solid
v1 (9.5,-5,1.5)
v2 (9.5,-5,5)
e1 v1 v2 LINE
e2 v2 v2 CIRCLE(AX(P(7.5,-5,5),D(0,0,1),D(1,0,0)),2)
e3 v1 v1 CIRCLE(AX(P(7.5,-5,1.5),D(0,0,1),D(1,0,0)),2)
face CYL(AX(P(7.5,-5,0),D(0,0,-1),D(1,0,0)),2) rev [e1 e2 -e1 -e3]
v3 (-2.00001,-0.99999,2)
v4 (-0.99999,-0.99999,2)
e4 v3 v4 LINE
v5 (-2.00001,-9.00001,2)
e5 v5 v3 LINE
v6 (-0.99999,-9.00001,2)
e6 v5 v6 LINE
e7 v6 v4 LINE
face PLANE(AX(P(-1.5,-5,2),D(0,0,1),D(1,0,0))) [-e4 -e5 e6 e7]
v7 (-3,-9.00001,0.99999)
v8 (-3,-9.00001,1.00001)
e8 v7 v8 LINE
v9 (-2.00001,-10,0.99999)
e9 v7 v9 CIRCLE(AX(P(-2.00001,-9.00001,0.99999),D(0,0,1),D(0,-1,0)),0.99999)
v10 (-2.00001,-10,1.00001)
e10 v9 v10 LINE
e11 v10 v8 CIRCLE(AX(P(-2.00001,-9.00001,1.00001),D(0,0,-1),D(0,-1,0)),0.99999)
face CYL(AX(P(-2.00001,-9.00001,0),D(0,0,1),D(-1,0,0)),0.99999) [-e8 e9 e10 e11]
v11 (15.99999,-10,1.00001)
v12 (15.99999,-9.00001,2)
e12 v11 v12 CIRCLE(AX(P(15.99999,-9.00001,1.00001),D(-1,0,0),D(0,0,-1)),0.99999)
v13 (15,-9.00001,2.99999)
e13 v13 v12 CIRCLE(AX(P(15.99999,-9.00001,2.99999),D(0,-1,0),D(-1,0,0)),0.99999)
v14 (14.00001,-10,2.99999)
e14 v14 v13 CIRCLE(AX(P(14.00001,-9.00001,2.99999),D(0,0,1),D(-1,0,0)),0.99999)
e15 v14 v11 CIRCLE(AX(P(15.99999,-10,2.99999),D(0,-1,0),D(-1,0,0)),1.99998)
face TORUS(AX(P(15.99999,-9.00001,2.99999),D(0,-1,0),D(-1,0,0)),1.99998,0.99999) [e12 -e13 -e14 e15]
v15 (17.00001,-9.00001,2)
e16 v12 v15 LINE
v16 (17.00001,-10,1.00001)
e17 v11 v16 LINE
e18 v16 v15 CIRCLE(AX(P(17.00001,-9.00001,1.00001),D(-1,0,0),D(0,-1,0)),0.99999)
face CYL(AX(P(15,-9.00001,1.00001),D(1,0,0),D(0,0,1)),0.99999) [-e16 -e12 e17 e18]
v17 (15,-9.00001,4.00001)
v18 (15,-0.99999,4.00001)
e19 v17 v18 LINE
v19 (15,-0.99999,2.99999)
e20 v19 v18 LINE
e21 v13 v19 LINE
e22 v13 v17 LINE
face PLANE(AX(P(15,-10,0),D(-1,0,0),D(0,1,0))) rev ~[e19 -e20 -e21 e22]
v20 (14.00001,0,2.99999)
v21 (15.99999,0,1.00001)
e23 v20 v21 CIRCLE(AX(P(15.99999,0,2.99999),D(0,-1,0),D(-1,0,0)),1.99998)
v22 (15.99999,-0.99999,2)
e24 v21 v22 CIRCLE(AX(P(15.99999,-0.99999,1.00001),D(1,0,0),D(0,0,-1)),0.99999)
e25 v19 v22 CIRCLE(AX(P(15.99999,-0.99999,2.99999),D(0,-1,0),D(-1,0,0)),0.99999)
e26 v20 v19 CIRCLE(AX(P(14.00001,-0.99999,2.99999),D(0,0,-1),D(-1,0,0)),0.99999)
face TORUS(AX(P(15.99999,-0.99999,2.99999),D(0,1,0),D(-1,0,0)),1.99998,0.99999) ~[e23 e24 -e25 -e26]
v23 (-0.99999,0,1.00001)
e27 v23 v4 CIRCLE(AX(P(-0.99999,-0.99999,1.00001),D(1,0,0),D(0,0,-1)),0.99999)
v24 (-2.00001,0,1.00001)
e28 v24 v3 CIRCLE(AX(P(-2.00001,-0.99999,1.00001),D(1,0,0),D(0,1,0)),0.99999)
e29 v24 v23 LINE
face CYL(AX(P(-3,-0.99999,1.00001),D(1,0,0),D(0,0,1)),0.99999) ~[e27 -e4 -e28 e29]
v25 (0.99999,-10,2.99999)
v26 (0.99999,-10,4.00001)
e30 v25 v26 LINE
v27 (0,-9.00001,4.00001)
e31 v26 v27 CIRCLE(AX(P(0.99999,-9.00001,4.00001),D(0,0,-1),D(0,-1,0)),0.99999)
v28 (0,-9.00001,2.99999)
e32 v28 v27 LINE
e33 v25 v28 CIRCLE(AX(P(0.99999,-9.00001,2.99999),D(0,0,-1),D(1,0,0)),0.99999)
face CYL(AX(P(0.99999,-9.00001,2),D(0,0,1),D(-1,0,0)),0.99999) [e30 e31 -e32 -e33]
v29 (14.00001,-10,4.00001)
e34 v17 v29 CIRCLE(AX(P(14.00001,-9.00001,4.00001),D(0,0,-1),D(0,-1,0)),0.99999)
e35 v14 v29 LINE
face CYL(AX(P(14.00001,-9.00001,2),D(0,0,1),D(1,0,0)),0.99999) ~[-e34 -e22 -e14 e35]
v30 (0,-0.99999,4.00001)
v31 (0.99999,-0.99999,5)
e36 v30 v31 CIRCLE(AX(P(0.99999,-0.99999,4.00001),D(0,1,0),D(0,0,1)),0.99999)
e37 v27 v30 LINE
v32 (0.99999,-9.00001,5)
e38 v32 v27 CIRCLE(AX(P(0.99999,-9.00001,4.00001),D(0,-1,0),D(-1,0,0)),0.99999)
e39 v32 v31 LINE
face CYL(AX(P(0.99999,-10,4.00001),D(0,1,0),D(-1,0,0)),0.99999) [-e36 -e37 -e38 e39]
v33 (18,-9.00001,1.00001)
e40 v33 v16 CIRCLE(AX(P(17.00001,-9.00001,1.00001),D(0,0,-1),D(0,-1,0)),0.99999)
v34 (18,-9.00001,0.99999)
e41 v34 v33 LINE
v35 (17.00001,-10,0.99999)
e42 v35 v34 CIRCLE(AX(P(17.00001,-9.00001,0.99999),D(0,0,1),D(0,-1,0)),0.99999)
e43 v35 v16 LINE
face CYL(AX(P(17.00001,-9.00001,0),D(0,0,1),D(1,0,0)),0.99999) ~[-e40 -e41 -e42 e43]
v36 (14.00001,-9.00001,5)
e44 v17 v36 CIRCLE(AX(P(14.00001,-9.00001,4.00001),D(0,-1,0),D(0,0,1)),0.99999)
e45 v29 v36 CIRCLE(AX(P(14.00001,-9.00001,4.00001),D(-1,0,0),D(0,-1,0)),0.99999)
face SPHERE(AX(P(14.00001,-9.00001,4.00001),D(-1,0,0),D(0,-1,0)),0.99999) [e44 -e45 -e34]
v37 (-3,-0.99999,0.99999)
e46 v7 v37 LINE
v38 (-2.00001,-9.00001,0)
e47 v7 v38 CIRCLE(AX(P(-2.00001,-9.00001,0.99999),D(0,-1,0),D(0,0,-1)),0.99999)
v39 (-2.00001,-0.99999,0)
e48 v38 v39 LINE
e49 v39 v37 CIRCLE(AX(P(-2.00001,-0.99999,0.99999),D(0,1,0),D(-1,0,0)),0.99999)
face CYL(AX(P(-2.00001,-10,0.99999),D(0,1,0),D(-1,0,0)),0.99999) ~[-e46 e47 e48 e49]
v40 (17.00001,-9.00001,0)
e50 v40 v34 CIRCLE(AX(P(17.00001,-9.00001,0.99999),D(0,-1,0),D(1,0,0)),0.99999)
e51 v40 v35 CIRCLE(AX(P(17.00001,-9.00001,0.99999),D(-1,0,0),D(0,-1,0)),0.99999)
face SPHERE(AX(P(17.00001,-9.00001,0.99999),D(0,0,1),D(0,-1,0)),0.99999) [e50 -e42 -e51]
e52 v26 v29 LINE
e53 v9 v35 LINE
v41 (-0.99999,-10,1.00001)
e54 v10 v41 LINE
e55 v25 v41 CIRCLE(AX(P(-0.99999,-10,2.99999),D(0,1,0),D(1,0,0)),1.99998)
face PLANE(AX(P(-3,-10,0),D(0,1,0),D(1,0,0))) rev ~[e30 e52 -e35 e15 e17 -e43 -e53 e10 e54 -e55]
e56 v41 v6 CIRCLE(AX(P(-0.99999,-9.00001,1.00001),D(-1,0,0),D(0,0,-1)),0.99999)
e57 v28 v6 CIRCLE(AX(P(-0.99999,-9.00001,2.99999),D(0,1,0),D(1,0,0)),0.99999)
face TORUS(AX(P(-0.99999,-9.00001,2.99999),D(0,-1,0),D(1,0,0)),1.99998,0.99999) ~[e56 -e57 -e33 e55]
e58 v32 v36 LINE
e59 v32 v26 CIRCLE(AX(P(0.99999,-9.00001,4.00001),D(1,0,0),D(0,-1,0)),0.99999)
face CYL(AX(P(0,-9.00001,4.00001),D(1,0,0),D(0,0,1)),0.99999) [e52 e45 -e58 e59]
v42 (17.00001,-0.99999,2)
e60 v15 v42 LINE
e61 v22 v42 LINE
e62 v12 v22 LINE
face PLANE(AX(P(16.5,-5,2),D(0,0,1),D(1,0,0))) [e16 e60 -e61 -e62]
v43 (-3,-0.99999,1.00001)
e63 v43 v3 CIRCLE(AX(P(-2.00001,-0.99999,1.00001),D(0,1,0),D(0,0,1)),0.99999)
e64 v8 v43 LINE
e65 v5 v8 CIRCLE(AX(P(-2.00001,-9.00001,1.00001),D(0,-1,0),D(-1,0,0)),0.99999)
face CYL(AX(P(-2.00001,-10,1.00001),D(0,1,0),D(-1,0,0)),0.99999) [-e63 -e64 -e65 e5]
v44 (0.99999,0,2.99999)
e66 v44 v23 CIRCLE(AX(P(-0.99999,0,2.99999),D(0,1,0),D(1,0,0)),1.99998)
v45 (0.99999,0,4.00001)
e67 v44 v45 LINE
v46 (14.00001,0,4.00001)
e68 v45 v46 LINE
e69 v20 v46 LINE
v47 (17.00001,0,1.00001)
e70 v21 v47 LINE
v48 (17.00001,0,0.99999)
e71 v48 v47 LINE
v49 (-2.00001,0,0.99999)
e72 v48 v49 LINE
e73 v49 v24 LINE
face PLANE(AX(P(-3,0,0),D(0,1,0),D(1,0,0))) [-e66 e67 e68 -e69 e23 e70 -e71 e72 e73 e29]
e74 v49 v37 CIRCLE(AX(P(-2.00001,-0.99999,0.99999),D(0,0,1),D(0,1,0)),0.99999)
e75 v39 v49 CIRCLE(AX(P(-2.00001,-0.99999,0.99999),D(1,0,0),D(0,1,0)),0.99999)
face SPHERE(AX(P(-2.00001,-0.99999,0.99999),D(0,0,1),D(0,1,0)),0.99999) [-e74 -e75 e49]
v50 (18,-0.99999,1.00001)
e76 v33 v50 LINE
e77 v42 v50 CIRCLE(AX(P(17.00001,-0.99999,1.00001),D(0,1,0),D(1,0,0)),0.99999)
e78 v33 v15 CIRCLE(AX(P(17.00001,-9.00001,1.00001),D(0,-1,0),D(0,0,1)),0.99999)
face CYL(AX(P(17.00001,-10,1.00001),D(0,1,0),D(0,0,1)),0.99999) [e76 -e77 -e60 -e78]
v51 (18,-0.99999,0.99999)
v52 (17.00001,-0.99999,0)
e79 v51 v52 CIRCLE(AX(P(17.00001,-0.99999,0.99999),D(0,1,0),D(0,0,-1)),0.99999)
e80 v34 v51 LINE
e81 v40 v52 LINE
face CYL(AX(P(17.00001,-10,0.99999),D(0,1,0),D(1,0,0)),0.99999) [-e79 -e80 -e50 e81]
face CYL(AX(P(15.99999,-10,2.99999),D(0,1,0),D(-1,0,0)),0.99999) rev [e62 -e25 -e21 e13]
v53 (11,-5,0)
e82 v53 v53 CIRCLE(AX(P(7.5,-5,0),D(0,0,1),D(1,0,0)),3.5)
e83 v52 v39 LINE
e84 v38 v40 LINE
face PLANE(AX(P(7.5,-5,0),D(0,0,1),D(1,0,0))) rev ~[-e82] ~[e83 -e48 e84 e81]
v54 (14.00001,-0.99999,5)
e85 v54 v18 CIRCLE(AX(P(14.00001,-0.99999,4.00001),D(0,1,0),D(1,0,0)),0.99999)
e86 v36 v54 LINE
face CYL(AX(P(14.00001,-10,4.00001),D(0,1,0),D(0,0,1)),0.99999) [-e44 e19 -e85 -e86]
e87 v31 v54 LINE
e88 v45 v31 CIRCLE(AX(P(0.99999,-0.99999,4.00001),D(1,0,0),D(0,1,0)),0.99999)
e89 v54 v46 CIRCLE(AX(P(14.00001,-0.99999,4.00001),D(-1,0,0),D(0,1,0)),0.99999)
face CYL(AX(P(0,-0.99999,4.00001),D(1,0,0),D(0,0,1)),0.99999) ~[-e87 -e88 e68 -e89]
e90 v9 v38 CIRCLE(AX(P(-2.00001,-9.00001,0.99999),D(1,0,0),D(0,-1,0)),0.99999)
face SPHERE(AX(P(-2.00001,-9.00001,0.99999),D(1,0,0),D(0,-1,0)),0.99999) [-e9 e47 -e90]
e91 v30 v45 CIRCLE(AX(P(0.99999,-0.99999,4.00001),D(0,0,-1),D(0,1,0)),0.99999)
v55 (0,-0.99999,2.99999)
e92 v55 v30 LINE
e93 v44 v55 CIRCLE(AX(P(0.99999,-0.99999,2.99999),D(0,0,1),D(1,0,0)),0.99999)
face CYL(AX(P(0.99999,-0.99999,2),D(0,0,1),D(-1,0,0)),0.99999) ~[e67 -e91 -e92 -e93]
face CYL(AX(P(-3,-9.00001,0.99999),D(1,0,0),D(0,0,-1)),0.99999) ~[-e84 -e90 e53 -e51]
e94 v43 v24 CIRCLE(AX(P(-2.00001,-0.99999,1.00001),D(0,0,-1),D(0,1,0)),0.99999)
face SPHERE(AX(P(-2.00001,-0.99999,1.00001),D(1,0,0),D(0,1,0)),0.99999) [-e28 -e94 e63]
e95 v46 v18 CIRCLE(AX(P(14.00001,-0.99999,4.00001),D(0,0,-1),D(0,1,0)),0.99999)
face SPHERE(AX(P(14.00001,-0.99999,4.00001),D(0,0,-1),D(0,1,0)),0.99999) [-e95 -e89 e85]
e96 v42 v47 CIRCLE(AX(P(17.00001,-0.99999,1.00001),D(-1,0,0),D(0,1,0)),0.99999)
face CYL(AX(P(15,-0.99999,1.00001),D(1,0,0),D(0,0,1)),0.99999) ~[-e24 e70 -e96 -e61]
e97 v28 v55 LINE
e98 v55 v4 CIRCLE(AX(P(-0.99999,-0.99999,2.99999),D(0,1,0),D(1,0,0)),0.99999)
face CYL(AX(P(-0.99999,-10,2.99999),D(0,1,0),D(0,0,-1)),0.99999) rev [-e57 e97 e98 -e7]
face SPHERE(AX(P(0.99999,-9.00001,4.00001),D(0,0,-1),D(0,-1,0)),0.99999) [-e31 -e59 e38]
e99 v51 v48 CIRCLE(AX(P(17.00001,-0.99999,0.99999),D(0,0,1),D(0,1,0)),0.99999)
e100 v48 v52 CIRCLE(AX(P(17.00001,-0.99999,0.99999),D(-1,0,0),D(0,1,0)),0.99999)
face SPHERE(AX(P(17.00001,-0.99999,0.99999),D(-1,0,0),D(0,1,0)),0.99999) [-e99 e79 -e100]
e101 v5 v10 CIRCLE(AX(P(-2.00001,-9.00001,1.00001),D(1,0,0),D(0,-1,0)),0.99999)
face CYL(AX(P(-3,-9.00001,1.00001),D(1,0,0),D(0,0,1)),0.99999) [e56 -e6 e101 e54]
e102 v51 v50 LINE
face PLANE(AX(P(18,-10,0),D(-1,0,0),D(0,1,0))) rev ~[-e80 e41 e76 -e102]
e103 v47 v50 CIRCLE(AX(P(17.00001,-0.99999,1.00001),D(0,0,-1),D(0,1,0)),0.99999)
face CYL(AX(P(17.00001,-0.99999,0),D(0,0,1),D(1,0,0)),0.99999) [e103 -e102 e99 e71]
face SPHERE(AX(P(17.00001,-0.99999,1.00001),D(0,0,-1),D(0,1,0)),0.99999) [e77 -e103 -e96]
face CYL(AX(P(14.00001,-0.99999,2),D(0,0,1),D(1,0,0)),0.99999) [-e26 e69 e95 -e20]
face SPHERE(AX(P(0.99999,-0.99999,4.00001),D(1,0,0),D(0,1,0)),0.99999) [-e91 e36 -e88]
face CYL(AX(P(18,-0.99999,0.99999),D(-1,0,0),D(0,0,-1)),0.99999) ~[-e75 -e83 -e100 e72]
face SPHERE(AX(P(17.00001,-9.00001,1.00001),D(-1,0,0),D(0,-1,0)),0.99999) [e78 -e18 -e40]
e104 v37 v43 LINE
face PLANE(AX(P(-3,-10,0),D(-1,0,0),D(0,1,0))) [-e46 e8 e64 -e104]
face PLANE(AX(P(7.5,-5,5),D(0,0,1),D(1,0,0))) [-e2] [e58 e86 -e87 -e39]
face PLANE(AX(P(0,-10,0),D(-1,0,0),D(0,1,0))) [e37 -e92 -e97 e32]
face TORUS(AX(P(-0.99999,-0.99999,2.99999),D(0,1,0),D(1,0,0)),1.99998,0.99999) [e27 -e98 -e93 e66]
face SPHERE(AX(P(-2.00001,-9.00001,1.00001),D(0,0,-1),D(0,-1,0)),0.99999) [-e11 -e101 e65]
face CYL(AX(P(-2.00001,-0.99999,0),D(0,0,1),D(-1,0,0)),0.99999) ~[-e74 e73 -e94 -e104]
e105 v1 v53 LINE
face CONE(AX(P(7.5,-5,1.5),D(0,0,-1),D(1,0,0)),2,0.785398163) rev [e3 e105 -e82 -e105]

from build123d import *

# Parameters (mm, degrees)
F0_W     = 15
F0_H     = 10
F0_R     = 3.5
F1_DEPTH = 5
F0_W_2   = 3
F2_DEPTH = 2
F3_R     = 0.99999
F0_R_2   = 2
F4_DEPTH = 5
F5_SIZE  = 1.5


# Not quite as in the source:
# - a fillet or chamfer is up to 0.001 mm smaller than in the source, because OpenCascade refuses the exact size


with BuildPart() as f1:
    # F0 (on Top) → F1 (new body)
    with BuildSketch(Plane.XY):
        with Locations((7.5, -5)):
            Rectangle(F0_W, F0_H)
        with Locations((7.5, -5)):
            Circle(F0_R, mode=Mode.SUBTRACT)
    extrude(amount=F1_DEPTH)

    # F0 (on Top) → F2 (join)
    with BuildSketch(Plane.XY):
        with Locations((-1.5, -5)):
            Rectangle(F0_W_2, F0_H)
        with Locations((16.5, -5)):
            Rectangle(F0_W_2, F0_H)
    extrude(amount=F2_DEPTH)

    # F3 (radius 1 in the source; OpenCascade refuses exactly that, so slightly less here)
    f3_edges = [f1.edges().sort_by_distance(p)[0] for p in [
        (15, 0, 3.5),
        (7.5, 0, 5),
        (0, 0, 3.5),
        (-1.5, 0, 2),
        (-3, 0, 1),
        (7.5, 0, 0),
        (18, 0, 1),
        (16.5, 0, 2),
        (0, -10, 3.5),
        (7.5, -10, 5),
        (15, -10, 3.5),
        (16.5, -10, 2),
        (18, -10, 1),
        (7.5, -10, 0),
        (-3, -10, 1),
        (-1.5, -10, 2),
        (15, -5, 2),
        (15, -5, 5),
        (18, -5, 0),
        (18, -5, 2),
        (0, -5, 2),
        (-3, -5, 2),
        (0, -5, 5),
        (-3, -5, 0),
    ]]
    fillet(f3_edges, radius=F3_R)

    # F0 (on Top) → F4 (join)
    with BuildSketch(Plane.XY):
        with Locations((7.5, -5)):
            Circle(F0_R)
        with Locations((7.5, -5)):
            Circle(F0_R_2, mode=Mode.SUBTRACT)
    extrude(amount=F4_DEPTH)

    # F5
    f5_edges = [f1.edges().sort_by_distance(p)[0] for p in [
        (5.5, -5, 0),
    ]]
    chamfer(f5_edges, length=F5_SIZE)


solid = f1.part
